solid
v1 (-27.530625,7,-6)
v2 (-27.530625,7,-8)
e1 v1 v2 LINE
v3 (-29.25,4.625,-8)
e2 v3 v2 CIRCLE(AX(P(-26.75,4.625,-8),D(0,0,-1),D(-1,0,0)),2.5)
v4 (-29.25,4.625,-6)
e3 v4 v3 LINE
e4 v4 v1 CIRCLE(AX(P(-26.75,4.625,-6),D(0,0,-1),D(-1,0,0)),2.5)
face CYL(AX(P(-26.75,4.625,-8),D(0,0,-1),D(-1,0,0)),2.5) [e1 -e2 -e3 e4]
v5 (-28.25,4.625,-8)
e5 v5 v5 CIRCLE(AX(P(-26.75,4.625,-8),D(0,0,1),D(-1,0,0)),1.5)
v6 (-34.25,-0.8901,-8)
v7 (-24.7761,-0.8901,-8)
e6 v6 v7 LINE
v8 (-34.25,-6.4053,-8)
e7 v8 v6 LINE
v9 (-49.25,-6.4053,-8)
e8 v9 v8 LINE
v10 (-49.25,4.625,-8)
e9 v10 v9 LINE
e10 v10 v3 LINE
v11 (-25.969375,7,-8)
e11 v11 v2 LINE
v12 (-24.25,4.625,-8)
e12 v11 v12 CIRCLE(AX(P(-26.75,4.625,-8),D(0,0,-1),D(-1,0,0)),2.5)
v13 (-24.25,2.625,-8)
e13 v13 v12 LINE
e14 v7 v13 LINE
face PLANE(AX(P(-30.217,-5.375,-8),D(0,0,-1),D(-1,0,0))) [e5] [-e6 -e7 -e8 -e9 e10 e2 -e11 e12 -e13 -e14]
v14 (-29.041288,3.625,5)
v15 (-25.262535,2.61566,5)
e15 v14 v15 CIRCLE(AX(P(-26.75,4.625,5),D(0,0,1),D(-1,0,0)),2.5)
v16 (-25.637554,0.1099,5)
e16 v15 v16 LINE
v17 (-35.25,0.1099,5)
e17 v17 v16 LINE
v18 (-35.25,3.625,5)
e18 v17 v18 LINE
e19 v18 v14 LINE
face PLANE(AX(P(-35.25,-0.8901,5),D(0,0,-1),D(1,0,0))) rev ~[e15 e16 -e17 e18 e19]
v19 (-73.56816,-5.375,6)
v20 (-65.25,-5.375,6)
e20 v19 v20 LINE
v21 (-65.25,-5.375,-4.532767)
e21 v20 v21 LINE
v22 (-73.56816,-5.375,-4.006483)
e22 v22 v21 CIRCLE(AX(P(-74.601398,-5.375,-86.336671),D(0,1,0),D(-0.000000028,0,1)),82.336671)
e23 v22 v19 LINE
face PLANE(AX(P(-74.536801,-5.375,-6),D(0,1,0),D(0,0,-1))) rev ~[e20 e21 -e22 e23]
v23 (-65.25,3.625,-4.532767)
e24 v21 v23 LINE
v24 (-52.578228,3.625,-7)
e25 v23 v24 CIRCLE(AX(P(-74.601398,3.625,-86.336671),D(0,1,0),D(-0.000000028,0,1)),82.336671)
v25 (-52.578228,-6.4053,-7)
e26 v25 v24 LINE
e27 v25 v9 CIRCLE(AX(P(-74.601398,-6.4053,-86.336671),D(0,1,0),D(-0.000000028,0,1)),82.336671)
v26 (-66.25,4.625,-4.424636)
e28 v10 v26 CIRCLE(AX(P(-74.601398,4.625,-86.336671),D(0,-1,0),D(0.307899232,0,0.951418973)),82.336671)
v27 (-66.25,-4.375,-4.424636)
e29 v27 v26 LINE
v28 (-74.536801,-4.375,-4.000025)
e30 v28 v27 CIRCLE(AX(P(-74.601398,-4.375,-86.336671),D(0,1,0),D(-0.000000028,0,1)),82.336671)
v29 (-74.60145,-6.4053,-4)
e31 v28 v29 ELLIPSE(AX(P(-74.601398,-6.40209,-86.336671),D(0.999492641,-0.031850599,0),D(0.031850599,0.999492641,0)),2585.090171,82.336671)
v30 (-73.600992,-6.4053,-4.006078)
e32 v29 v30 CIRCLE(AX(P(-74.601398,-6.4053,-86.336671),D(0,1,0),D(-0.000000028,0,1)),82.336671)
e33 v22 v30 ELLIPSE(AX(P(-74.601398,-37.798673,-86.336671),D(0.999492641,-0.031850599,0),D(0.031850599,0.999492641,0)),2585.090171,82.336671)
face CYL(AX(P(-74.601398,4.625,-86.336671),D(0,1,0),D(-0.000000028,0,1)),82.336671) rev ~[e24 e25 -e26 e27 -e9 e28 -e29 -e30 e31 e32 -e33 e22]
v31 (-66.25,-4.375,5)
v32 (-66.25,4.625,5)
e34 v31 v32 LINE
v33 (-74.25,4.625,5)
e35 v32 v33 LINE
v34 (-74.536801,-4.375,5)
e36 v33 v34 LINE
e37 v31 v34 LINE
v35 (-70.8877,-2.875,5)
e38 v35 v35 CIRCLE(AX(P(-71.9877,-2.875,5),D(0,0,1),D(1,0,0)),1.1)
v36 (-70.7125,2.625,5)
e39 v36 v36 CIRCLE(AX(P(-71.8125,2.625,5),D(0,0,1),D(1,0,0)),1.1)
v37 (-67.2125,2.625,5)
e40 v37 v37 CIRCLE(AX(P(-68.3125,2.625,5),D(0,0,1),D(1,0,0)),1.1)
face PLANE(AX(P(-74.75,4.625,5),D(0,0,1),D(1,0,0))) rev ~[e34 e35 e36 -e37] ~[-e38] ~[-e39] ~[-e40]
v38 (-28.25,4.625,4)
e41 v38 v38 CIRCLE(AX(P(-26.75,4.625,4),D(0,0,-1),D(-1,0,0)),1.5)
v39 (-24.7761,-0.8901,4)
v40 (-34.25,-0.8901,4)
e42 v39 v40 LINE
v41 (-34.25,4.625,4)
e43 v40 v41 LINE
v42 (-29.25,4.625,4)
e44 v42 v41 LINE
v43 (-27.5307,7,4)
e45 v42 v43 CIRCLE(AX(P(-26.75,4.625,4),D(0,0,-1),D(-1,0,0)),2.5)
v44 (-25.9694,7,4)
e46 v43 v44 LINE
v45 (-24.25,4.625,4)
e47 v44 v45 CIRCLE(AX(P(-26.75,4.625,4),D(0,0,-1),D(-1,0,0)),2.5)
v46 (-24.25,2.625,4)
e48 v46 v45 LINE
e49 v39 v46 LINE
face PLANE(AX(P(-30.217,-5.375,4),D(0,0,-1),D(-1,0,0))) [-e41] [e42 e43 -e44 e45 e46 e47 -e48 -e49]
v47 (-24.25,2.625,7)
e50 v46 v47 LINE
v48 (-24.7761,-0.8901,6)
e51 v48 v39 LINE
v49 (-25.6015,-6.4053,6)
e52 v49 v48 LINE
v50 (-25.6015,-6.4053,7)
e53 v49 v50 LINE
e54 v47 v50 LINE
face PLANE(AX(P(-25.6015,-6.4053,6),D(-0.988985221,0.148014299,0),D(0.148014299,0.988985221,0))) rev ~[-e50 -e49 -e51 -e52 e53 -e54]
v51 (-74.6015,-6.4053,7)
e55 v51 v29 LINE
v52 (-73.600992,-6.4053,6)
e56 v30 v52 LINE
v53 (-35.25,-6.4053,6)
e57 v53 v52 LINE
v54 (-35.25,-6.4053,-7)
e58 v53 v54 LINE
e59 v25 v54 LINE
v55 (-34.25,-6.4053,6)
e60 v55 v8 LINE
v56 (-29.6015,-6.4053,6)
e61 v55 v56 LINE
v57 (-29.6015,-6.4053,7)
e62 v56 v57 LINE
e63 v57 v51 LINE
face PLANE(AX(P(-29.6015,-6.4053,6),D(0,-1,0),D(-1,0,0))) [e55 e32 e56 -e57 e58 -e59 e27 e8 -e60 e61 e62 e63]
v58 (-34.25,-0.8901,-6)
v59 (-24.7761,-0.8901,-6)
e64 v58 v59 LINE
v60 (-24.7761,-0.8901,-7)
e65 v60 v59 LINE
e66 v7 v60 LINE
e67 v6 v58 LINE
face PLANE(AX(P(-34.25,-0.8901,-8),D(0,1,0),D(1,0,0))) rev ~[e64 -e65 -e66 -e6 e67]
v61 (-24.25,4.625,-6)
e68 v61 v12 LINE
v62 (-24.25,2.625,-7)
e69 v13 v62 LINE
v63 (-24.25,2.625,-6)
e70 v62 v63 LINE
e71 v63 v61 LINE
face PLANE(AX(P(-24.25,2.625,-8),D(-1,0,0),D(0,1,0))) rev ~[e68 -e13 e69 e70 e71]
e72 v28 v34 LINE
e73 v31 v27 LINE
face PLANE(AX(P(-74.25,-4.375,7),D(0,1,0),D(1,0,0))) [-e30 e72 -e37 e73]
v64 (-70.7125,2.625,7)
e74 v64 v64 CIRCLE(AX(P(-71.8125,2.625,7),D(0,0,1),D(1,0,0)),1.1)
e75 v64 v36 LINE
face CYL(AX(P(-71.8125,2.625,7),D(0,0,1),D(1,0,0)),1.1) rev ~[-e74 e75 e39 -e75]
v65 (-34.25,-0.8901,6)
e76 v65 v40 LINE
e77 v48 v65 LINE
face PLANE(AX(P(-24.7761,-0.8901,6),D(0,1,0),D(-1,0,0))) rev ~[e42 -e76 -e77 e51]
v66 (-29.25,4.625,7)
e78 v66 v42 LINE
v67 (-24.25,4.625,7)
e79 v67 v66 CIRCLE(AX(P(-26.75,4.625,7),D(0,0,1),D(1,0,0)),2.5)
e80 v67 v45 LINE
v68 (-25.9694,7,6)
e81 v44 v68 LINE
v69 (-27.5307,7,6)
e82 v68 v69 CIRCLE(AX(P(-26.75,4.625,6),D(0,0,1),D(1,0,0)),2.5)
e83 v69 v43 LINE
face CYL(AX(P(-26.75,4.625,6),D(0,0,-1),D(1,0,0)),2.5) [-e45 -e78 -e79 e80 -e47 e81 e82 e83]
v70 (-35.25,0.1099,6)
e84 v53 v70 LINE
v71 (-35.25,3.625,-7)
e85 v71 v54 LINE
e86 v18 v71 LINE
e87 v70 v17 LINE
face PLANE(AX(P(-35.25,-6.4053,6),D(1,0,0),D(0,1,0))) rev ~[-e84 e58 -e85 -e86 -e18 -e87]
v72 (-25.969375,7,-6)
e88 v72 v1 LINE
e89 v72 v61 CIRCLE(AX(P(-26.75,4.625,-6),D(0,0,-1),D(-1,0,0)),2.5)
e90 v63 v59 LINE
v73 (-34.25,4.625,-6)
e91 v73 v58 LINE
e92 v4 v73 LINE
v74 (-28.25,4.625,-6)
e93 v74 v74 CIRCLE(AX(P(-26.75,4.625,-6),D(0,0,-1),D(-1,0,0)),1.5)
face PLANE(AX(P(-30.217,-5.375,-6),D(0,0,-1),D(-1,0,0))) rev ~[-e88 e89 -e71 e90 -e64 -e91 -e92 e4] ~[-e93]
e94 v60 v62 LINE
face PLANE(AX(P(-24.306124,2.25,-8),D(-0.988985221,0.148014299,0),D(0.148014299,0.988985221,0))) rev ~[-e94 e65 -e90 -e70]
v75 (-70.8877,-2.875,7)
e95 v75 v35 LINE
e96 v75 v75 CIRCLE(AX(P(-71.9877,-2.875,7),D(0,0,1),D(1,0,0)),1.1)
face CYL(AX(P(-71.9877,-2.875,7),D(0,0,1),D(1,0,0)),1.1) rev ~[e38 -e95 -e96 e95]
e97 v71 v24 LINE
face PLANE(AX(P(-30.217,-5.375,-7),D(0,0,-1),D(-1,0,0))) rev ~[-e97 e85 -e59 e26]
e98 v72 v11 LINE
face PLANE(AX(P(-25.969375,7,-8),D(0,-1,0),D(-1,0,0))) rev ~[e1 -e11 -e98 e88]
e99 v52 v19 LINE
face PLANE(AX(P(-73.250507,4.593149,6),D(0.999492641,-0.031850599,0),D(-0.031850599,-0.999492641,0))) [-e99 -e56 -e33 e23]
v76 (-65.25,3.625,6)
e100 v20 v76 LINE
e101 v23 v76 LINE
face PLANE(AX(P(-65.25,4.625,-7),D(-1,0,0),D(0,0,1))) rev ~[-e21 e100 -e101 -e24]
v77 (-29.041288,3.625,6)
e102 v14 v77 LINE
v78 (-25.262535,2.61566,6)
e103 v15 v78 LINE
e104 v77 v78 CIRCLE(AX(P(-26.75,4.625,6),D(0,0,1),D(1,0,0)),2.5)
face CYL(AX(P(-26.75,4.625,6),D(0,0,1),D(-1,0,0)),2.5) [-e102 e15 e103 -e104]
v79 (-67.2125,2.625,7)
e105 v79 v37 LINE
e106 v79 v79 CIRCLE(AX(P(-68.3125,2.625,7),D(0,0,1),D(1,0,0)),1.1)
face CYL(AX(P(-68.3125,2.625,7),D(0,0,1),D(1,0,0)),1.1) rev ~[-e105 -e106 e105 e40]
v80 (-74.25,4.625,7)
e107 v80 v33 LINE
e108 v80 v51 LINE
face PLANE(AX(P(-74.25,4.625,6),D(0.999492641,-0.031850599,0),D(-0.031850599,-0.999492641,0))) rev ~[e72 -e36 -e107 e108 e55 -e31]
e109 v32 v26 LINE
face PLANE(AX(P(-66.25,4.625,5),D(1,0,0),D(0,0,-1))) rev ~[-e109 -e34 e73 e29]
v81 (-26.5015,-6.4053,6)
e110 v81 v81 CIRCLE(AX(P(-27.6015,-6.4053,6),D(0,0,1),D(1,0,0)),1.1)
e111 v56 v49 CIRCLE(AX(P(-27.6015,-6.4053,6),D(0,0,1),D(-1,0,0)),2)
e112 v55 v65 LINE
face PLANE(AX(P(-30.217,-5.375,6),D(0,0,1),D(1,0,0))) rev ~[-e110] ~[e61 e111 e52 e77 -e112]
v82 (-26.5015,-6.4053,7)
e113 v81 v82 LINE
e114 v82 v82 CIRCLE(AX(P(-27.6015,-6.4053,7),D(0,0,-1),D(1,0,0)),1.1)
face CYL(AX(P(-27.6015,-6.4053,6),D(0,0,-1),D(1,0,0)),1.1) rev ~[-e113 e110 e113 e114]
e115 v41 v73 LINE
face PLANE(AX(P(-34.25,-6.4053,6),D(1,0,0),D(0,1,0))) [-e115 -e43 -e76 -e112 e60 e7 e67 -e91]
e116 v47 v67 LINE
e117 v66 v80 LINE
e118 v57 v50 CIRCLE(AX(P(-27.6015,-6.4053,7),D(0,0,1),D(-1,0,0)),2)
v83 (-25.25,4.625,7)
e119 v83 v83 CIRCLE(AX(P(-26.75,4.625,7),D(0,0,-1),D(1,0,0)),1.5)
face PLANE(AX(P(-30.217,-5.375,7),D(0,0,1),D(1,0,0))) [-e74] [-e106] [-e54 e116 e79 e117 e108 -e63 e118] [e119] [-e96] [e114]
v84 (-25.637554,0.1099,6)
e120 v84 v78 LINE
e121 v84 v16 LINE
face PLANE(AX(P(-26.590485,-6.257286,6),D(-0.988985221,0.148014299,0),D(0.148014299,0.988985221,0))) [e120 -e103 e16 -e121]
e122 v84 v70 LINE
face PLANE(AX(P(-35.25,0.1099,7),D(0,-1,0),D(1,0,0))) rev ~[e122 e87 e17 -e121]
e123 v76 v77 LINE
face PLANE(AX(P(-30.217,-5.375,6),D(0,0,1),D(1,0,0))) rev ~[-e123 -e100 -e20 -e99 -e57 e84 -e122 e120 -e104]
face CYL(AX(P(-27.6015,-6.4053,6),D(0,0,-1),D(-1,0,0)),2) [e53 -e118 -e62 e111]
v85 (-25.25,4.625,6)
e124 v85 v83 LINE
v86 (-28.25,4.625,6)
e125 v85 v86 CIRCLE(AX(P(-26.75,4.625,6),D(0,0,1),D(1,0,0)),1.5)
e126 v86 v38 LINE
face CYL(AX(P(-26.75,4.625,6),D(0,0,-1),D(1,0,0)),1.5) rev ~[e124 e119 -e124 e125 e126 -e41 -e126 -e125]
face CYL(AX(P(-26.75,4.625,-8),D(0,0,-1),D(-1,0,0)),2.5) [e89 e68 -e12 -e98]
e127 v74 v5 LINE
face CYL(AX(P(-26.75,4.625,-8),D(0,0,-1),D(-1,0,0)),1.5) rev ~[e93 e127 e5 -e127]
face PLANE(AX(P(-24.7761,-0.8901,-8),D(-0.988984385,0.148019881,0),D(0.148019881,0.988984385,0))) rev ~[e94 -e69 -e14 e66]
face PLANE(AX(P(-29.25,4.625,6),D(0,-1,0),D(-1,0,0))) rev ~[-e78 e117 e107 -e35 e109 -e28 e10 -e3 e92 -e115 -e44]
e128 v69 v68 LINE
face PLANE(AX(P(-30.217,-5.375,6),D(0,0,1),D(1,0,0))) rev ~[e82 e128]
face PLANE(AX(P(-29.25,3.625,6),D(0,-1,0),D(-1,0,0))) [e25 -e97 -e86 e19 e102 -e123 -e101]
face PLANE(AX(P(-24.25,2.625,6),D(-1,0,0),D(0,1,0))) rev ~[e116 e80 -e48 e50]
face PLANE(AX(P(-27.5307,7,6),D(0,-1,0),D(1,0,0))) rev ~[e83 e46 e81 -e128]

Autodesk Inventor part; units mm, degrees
ref_plane "YZ Plane" through (0, 0, 0) normal (1, 0, 0) x (0, 1, 0)
ref_plane "XZ Plane" through (0, 0, 0) normal (0, 1, 0) x (-1, 0, 0)
ref_plane "XY Plane" through (0, 0, 0) normal (0, 0, 1) x (1, 0, 0)
ref_plane "Work Plane1" through (-21.75, 2.25, -0.6) normal (0, 0, 1) x (-1, 0, 0)
ref_plane "Work Plane2" through (-30.217, -5.375, 6) normal (0, 0, 1) x (1, 0, 0)
sketch "Sketch1" plane through (-30.217, -5.375, 6) normal (0, 0, 1) x (1, 0, 0)
  circle A0 centre (2.6155, -1.0303) radius 1.1 projected
  circle A1 centre (3.467, 10) radius 1.5 projected
  line L0 (4.6155, -1.0303) -> (5.967, 8)
  line L1 (0.6155, -1.0303) -> (-44.3845, -1.0303)
  arc A2 (0.6155, -1.0303) -> (4.6155, -1.0303) centre (2.6155, -1.0303) ccw
  line L2 (5.967, 8) -> (5.967, 10)
  line L3 (0.967, 10) -> (-44.033, 10)
  arc A3 (5.967, 10) -> (0.967, 10) centre (3.467, 10) ccw
  line L4 (-44.033, 10) -> (-44.3845, -1.0303)
  point P0 (30.217, 5.375)
  dimension "d0" = 2
  dimension "d1" = 2
  dimension "d2" = 2
  dimension "d3" = 2.5
  dimension "d4" = 2
  dimension "d5" = 2.5
  dimension "d6" = 2.5
  dimension "d7" = 45
  dimension "d8" = 45
extrude "Extrusion1" add sketch "Sketch1" along normal blind 1
sketch "Sketch2" plane through (-30.217, -5.375, 6) normal (0, 0, -1) x (-1, 0, 0)
  arc A0 (-0.967, 10) -> (-5.967, 10) centre (-3.467, 10) ccw projected
  line L0 (-5.967, 8) -> (-5.967, 10) projected
  line L1 (-4.6155, -1.0303) -> (-5.967, 8) projected
  arc A1 (-4.6155, -1.0303) -> (-0.6155, -1.0303) centre (-2.6155, -1.0303) ccw projected
  line L2 (44.3845, -1.0303) -> (-0.6155, -1.0303) projected
  line L3 (44.033, 10) -> (44.3845, -1.0303) projected
  line L4 (-0.967, 10) -> (44.033, 10) projected
  circle A2 centre (-2.6155, -1.0303) radius 1.1 projected
  circle A3 centre (-3.467, 10) radius 1.5 projected
  line L5 (44.3845, -1.0303) -> (-0.6155, -1.0303) projected
  line L6 (4.033, -1.0303) -> (4.033, 10)
  line L7 (-0.967, 10) -> (44.033, 10) projected
  point P0 (-30.217, 5.375)
  point P1 (4.033, 10)
  point P2 (4.033, -1.0303)
  dimension "d11" = 5
extrude "Extrusion2" add sketch "Sketch2" along normal blind 14 contours L4 L3 L2 L6
sketch "Sketch3" plane through (-30.217, -5.375, -8) normal (0, 0, -1) x (-1, 0, 0)
  circle A0 centre (-3.467, 10) radius 1.5 projected
  line L0 (-8.467, 7.625) -> (-8.467, 12.375) projected
  line L1 (-8.467, 7.625) -> (-0.967, 7.625) projected
  line L2 (-0.967, 12.375) -> (-0.967, 7.625) projected
  line L3 (-8.467, 12.375) -> (-0.967, 12.375) projected
  line L4 (44.033, 10) -> (4.033, 10) projected
  line L5 (4.033, 10) -> (4.033, -1.0303) projected
  line L6 (4.033, -1.0303) -> (44.3845, -1.0303) projected
  line L7 (44.3845, -1.0303) -> (44.033, 10) projected
  circle A1 centre (-3.467, 10) radius 1.5 projected
  circle A2 centre (-2.6155, -1.0303) radius 1.1 projected
  line L8 (4.033, -1.0303) -> (4.033, 10) projected
  line L9 (-0.967, 10) -> (4.033, 10) projected
  arc A3 (-0.967, 10) -> (-5.967, 10) centre (-3.467, 10) ccw projected
  line L10 (-5.967, 8) -> (-5.967, 10) projected
  line L11 (-4.6155, -1.0303) -> (-5.967, 8) projected
  arc A4 (-4.6155, -1.0303) -> (-0.6155, -1.0303) centre (-2.6155, -1.0303) ccw projected
  line L12 (4.033, -1.0303) -> (-0.6155, -1.0303) projected
  line L13 (4.033, 10) -> (4.033, -1.0303) projected
  line L14 (4.033, 4.4849) -> (-5.4409, 4.4849)
  line L15 (-4.6155, -1.0303) -> (-5.967, 8) projected
  point P0 (-30.217, 5.375)
  point P1 (-5.4409, 4.4849)
  point P2 (-2.6863, 12.375)
  point P3 (-4.2476, 12.375)
extrude "Extrusion3" add sketch "Sketch3" against normal blind 2 contours L11 L10 A3 L3 L2 L1 | L1 L2 L9 L5 L14 L11
sketch "Sketch4" plane through (-30.217, -5.375, 6) normal (0, 0, -1) x (-1, 0, 0)
  circle A0 centre (-3.467, 10) radius 1.5 projected
  circle A1 centre (-2.6155, -1.0303) radius 1.1 projected
  line L0 (4.033, -1.0303) -> (4.033, 10) projected
  line L1 (-0.967, 10) -> (4.033, 10) projected
  arc A2 (-0.967, 10) -> (-5.967, 10) centre (-3.467, 10) ccw projected
  line L2 (-5.967, 8) -> (-5.967, 10) projected
  line L3 (-4.6155, -1.0303) -> (-5.967, 8) projected
  arc A3 (-4.6155, -1.0303) -> (-0.6155, -1.0303) centre (-2.6155, -1.0303) ccw projected
  line L4 (4.033, -1.0303) -> (-0.6155, -1.0303) projected
  circle A4 centre (-3.467, 10) radius 1.5 projected
  circle A5 centre (-3.467, 10) radius 2.5
  arc A6 (-0.967, 10) -> (-5.967, 10) centre (-3.467, 10) ccw projected
  circle A7 centre (-3.467, 10) radius 1.5 projected
  line L5 (44.033, 10) -> (-0.967, 10) projected
  arc A8 (-0.967, 10) -> (-2.6863, 12.375) centre (-3.467, 10) ccw projected
  line L6 (-2.6863, 12.375) -> (-4.2476, 12.375) projected
  arc A9 (-4.2476, 12.375) -> (-5.967, 10) centre (-3.467, 10) ccw projected
  line L7 (-5.967, 10) -> (-5.967, 8) projected
  line L8 (-5.967, 8) -> (-5.4409, 4.4849) projected
  line L9 (-5.4409, 4.4849) -> (4.033, 4.4849) projected
  line L10 (4.033, 4.4849) -> (4.033, -1.0303) projected
  line L11 (4.033, -1.0303) -> (44.3845, -1.0303) projected
  line L12 (44.3845, -1.0303) -> (44.033, 10) projected
  point P0 (-30.217, 5.375)
extrude "Extrusion4" add sketch "Sketch4" along normal blind 2 contours L9 L3 L2 A5 L1 L0 | A5 A2 L6
sketch "Sketch5" plane through (-74.25, 4.625, 7) normal (0, 1, 0) x (1, 0, 0)
  line L0 (45, 3) -> (45, 0) projected
  line L1 (40, 3) -> (45, 3) projected
  line L2 (40, 3) -> (40, 13) projected
  line L3 (45, 13) -> (40, 13) projected
  line L4 (45, 15) -> (45, 13) projected
  line L5 (0, 15) -> (45, 15) projected
  line L6 (0, 15) -> (0, 0) projected
  line L7 (45, 0) -> (0, 0) projected
  line L8 (8, 13) -> (-0.5, 13)
  line L9 (-0.5, 13) -> (-0.5, 2)
  line L10 (-0.5, 2) -> (8, 2)
  line L11 (8, 2) -> (8, 13)
  point P0 (74.25, 7)
  point P1 (8, 7.5)
  point P2 (0, 7.5)
  dimension "d18" = 8
  dimension "d19" = 0.5
  dimension "d20" = 2
extrude "Extrusion5" cut sketch "Sketch5" against normal blind 9 contours L10 L9 L8 L6 | L6 L8 L11 L10
shell "Shell1" thickness 1 removed faces 1 at (-61.1509, -6.4053, 1.6667)
sketch "Sketch6" plane through (-30.217, -5.375, 7) normal (0, 0, 1) x (1, 0, 0)
  circle A0 centre (-41.7707, 2.5) radius 1.1
  line L0 (-44.033, 10) -> (-44.3845, -1.0303) construction
  point P0 (30.217, 5.375)
  point P1 (-44.3198, 1)
  dimension "d24" = 2.2
  dimension "d25" = 1.5
  dimension "d26" = 2.5
extrude "Extrusion6" cut sketch "Sketch6" against normal up to surface (2 mm away)
sketch "Sketch7" plane through (-30.217, -5.375, 7) normal (0, 0, 1) x (1, 0, 0)
  circle A0 centre (-41.5955, 8) radius 1.1
  circle A1 centre (-41.7707, 2.5) radius 1.1 construction
  line L0 (-44.033, 10) -> (-44.3845, -1.0303) construction
  line L1 (0.967, 10) -> (-44.033, 10) construction
  point P0 (30.217, 5.375)
  dimension "d29" = 2.2
  dimension "d30" = 2.5
  dimension "d31" = 2
extrude "Extrusion7" cut sketch "Sketch7" against normal up to surface (2 mm away)
sketch "Sketch8" plane through (-74.25, 4.625, 7) normal (0, 1, 0) x (1, 0, 0)
  line L0 (0, 13) -> (8, 13) projected
  line L1 (8, 13) -> (8, 2) projected
  line L2 (8, 2) -> (0, 2) projected
  line L3 (0, 2) -> (0, 0) projected
  line L4 (45, 0) -> (0, 0) projected
  line L5 (45, 3) -> (45, 0) projected
  line L6 (40, 3) -> (45, 3) projected
  line L7 (40, 3) -> (40, 13) projected
  line L8 (45, 13) -> (40, 13) projected
  line L9 (45, 15) -> (45, 13) projected
  line L10 (0, 15) -> (45, 15) projected
  line L11 (0, 15) -> (0, 13) projected
  line L12 (-0.2867, 2) -> (-0.2867, 13) projected
  line L13 (8, 2) -> (-0.2867, 2) projected
  line L14 (8, 13) -> (8, 2) projected
  line L15 (-0.2867, 13) -> (8, 13) projected
  line L16 (-0.3514, 15) -> (-0.3514, 0) projected
  line L17 (0, 15) -> (45, 15) projected
  arc A0 (-0.3514, 11) -> (25, 15) centre (-0.3514, 93.3367) ccw
  line L18 (-0.3514, 15) -> (0, 15) projected
  point P0 (74.25, 7)
  point P1 (25, 15)
  dimension "d34" = 20
  dimension "d35" = 4
extrude "Extrusion8" cut sketch "Sketch8" against normal up to next contours L11 L10 A0 L1 L0 | L15 L12 A0 L16 L18 L11 | L0 L1 A0 L12 L15
sketch "Sketch9" plane through (-30.217, -5.375, 7) normal (0, 0, 1) x (1, 0, 0)
  circle A0 centre (-41.5955, 8) radius 1.1 projected
  circle A1 centre (-41.7707, 2.5) radius 1.1 projected
  arc A2 (5.967, 10) -> (0.967, 10) centre (3.467, 10) ccw projected
  line L0 (0.967, 10) -> (-44.033, 10) projected
  line L1 (-44.033, 10) -> (-44.3845, -1.0303) projected
  line L2 (-44.3845, -1.0303) -> (0.6155, -1.0303) projected
  arc A3 (0.6155, -1.0303) -> (4.6155, -1.0303) centre (2.6155, -1.0303) ccw projected
  line L3 (4.6155, -1.0303) -> (5.967, 8) projected
  line L4 (5.967, 8) -> (5.967, 10) projected
  circle A4 centre (2.6155, -1.0303) radius 1.1 projected
  circle A5 centre (3.467, 10) radius 1.5 projected
  circle A6 centre (-38.0955, 8) radius 1.1
  point P0 (30.217, 5.375)
  dimension "d38" = 2.2
  dimension "d39" = 3.5
extrude "Extrusion9" cut sketch "Sketch9" against normal up to surface (2 mm away) contours A6
sketch "Sketch10" plane through (-30.217, -5.375, -8) normal (0, 0, -1) x (-1, 0, 0)
  circle A0 centre (-2.6155, -1.0303) radius 1.1 construction
  circle A1 centre (-3.467, 10) radius 1.5 construction
  circle A2 centre (-2.6155, -1.0303) radius 11.0631 construction
  point P0 (-30.217, 5.375)
properties part number "Dedo_1"
